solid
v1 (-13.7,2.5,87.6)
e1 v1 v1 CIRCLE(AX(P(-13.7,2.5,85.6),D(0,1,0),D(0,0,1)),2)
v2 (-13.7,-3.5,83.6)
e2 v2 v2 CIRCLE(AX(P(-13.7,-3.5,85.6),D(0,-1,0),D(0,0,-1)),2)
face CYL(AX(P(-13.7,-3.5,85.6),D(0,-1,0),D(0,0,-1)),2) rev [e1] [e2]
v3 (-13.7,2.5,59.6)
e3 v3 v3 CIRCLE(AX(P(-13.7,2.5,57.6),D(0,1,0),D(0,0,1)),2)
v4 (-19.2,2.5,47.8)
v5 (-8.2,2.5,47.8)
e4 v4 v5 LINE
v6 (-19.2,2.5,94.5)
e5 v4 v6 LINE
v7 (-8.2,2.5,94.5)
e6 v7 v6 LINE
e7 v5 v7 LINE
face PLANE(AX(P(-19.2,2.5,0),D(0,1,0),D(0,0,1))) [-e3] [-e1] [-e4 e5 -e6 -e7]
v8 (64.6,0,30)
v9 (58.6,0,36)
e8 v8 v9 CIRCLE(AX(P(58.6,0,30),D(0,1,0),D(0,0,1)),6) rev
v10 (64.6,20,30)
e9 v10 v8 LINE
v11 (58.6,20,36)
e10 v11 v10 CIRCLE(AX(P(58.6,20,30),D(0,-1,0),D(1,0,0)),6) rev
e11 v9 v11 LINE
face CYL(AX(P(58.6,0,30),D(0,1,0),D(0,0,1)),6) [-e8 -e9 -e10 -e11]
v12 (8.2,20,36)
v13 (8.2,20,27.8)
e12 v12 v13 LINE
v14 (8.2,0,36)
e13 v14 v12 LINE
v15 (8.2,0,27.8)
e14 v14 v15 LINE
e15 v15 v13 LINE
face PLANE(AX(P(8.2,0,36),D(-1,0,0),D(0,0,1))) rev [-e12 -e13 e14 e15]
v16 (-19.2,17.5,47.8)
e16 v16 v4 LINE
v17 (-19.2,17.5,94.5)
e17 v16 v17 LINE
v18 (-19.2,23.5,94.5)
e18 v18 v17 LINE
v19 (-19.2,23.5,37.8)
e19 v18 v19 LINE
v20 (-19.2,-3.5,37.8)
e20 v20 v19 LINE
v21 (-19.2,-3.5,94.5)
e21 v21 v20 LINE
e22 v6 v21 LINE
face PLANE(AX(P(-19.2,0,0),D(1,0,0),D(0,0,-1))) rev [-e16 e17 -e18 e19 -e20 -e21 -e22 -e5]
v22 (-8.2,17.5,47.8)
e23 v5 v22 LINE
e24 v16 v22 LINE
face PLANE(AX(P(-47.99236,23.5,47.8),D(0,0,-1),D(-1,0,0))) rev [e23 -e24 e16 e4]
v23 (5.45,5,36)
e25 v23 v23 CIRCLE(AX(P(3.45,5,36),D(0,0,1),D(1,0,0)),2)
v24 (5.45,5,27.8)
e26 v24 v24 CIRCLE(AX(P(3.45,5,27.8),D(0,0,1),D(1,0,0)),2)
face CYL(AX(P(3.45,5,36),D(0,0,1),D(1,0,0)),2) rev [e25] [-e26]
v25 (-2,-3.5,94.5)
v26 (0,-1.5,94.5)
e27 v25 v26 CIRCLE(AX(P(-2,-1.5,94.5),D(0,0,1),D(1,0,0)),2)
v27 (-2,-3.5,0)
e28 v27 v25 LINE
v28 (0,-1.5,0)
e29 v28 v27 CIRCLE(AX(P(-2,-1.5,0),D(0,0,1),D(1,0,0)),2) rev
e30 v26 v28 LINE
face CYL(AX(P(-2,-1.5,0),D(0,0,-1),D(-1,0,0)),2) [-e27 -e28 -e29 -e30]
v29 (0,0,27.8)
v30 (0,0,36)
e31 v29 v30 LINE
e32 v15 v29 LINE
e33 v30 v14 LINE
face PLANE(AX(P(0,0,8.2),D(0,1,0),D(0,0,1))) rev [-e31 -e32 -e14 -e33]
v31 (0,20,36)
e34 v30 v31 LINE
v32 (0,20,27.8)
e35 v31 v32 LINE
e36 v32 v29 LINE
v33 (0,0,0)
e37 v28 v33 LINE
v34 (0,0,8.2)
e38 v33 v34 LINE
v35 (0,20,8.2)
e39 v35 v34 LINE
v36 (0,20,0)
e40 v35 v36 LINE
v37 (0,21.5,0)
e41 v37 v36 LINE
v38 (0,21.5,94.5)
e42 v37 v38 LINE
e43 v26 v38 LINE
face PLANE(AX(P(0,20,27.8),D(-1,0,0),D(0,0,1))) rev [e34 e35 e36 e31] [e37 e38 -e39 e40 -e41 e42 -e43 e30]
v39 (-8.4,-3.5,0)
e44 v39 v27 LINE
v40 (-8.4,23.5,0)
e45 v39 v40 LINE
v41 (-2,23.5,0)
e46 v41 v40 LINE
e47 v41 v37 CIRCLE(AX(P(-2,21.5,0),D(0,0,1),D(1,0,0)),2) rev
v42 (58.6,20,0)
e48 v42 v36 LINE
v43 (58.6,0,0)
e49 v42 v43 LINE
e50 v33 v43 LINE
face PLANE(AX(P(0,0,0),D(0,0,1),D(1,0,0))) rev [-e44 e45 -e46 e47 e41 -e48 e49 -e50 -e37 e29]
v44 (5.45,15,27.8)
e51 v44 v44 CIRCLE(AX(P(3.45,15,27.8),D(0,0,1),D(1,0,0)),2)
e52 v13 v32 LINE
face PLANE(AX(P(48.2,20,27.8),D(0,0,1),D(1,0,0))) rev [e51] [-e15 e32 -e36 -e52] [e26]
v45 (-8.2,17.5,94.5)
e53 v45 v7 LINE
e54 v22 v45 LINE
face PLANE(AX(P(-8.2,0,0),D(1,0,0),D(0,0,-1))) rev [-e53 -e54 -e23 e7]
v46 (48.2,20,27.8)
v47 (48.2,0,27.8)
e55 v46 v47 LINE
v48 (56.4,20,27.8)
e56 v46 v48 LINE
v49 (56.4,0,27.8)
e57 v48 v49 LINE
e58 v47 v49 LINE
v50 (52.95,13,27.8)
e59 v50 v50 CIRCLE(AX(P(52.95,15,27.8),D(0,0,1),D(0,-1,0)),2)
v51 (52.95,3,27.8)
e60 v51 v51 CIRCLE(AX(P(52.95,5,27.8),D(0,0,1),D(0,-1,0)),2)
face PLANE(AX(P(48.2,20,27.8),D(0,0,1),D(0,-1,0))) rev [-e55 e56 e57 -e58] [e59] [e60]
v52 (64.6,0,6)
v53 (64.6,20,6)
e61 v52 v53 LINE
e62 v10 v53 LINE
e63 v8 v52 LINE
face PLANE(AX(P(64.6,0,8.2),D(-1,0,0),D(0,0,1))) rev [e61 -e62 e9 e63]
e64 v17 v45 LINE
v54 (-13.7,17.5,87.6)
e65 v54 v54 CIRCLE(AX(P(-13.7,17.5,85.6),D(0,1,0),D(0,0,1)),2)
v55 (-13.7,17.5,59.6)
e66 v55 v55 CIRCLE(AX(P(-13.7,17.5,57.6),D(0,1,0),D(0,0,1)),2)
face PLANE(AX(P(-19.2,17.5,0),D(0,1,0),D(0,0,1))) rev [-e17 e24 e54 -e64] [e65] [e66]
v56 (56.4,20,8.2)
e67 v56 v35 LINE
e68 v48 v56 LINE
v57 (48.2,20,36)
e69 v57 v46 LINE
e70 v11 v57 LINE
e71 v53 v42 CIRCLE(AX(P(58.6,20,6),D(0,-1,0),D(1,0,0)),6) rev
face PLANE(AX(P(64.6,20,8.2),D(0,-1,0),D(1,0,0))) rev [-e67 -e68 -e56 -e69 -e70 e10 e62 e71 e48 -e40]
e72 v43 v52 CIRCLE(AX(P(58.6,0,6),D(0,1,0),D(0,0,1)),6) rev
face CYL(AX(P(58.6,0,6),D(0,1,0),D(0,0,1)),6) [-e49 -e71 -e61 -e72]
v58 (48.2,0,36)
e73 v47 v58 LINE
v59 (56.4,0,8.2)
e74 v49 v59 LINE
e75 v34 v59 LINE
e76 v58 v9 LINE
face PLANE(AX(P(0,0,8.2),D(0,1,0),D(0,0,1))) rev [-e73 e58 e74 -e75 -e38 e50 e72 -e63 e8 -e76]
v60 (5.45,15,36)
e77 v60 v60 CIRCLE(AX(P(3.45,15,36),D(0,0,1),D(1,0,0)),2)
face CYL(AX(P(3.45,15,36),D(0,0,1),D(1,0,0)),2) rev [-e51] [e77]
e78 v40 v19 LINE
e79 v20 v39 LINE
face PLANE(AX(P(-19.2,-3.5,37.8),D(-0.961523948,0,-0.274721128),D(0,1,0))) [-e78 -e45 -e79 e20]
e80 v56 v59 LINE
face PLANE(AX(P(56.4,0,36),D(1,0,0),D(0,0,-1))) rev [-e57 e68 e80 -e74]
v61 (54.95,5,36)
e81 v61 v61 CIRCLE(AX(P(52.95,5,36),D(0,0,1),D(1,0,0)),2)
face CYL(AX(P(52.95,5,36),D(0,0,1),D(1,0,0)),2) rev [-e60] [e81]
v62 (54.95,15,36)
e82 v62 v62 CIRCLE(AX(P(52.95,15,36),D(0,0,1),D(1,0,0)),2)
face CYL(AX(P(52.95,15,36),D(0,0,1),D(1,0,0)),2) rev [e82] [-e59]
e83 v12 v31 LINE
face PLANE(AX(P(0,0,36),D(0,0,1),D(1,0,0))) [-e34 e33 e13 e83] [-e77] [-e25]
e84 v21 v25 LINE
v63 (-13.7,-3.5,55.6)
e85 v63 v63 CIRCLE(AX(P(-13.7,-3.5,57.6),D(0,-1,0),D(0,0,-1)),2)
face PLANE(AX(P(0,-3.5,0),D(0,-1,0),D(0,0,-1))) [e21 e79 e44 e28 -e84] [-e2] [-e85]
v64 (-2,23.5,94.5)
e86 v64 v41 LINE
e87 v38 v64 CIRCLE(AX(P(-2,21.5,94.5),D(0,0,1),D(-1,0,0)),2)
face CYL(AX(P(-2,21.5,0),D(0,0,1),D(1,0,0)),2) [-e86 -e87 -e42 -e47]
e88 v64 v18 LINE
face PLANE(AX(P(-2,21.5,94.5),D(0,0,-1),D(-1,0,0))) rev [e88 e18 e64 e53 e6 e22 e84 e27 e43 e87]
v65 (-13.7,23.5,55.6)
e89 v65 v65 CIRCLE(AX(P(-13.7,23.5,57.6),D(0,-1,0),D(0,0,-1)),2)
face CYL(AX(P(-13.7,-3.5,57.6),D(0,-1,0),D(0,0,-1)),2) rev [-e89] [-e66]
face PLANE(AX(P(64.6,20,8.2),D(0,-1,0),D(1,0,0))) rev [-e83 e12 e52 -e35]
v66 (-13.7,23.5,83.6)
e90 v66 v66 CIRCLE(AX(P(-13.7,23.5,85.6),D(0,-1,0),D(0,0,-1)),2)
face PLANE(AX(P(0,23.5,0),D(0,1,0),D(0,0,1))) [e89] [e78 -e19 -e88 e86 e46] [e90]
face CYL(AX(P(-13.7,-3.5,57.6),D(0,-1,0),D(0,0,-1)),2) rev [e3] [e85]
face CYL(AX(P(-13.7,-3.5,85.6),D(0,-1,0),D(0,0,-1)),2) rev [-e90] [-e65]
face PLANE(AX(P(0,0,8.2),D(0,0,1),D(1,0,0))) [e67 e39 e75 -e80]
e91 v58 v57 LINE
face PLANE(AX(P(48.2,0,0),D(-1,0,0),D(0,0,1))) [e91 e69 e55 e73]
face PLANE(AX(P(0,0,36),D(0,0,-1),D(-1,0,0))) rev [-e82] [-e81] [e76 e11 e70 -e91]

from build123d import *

# Parameters (mm, degrees)
SCHIZZO1_W                    = 64.6
SCHIZZO1_H                    = 20
ESTRUSIONE_ESTRUSIONE1_DEPTH  = 8.2
SCHIZZO2_W                    = 8.2
SCHIZZO2_H                    = 20
ESTRUSIONE_ESTRUSIONE2_DEPTH  = 27.8
SCHIZZO3_W                    = 8.2
SCHIZZO3_H                    = 20
ESTRUSIONE_ESTRUSIONE3_DEPTH  = 27.8
SCHIZZO4_W                    = 8.2
SCHIZZO4_H                    = 20
ESTRUSIONE_ESTRUSIONE4_DEPTH  = 8.2
SCHIZZO5_W                    = 36
SCHIZZO5_H                    = 20
ESTRUSIONE_ESTRUSIONE5_DEPTH  = 8.2
SCHIZZO6_W                    = 48.2
SCHIZZO6_H                    = 19.6
TAGLIO_ESTRUSIONE1_DEPTH      = 77.610443152
F_4_0_4_DIAMETER_HOLE2_D      = 4
F_4_0_4_DIAMETER_HOLE2_DEPTH  = 8.2
RACCORDO3_R                   = 6
SCHIZZO15_W                   = 8.2
SCHIZZO15_H                   = 36
ESTRUSIONE_ESTRUSIONE7_DEPTH  = 3.5
SCHIZZO16_W                   = 8.2
SCHIZZO16_H                   = 36
ESTRUSIONE_ESTRUSIONE8_DEPTH  = 3.5
SCHIZZO17_W                   = 36
SCHIZZO17_H                   = 6
ESTRUSIONE_ESTRUSIONE9_DEPTH  = 11
RACCORDO6_R                   = 2
ESTRUSIONE_ESTRUSIONE11_DEPTH = 58.5
F_4_0_4_DIAMETER_HOLE1_D      = 4
SKETCH1_W                     = 47.8
SKETCH1_H                     = 27
CUT_EXTRUDE1_DEPTH            = 11
SKETCH3_W                     = 10
SKETCH3_H                     = 27
BOSS_EXTRUDE1_DEPTH           = 11
CHAMFER1_SIZE                 = 11
CHAMFER1_SIZE_2               = 38.5


with BuildPart() as part:
    # Schizzo1 → Estrusione-Estrusione1 (new body)
    with BuildSketch(Plane.XY):
        with Locations((32.3, 10)):
            Rectangle(SCHIZZO1_W, SCHIZZO1_H)
    extrude(amount=ESTRUSIONE_ESTRUSIONE1_DEPTH)

    # Schizzo2 → Estrusione-Estrusione2 (add)
    with BuildSketch(Plane.XY.offset(8.2)):
        with Locations((4.1, 10)):
            Rectangle(SCHIZZO2_W, SCHIZZO2_H)
    extrude(amount=ESTRUSIONE_ESTRUSIONE2_DEPTH)

    # Schizzo3 → Estrusione-Estrusione3 (add)
    with BuildSketch(Plane.XY.offset(8.2)):
        with Locations((60.5, 10)):
            Rectangle(SCHIZZO3_W, SCHIZZO3_H)
    extrude(amount=ESTRUSIONE_ESTRUSIONE3_DEPTH)

    # Schizzo4 → Estrusione-Estrusione4 (add)
    with BuildSketch(Plane.ZY.offset(-56.4)):
        with Locations((31.9, 10)):
            Rectangle(SCHIZZO4_W, SCHIZZO4_H)
    extrude(amount=ESTRUSIONE_ESTRUSIONE4_DEPTH)

    # Schizzo5 → Estrusione-Estrusione5 (add)
    with BuildSketch(Plane.ZY):
        with Locations((18, 10)):
            Rectangle(SCHIZZO5_W, SCHIZZO5_H)
    extrude(amount=ESTRUSIONE_ESTRUSIONE5_DEPTH)

    # Schizzo6 → Taglio-Estrusione1 (cut, through all)
    with BuildSketch(Plane.XZ):
        with Locations((24.1, 18)):
            Rectangle(SCHIZZO6_W, SCHIZZO6_H)
    extrude(amount=-TAGLIO_ESTRUSIONE1_DEPTH, mode=Mode.SUBTRACT)

    # Ø4.0 (4) Diameter Hole2
    with Locations(Plane.XY.offset(36)):
        with Locations((52.95, 5), (3.45, 5), (3.45, 15), (52.95, 15)):
            Hole(F_4_0_4_DIAMETER_HOLE2_D / 2, depth=F_4_0_4_DIAMETER_HOLE2_DEPTH)

    # Raccordo3
    raccordo3_edges = [part.edges().sort_by_distance(p)[0] for p in [
        (64.6, 10, 36),
        (64.6, 10, 0),
    ]]
    fillet(raccordo3_edges, radius=RACCORDO3_R)

    # Schizzo15 → Estrusione-Estrusione7 (add)
    with BuildSketch(Plane.XZ):
        with Locations((-4.1, 18)):
            Rectangle(SCHIZZO15_W, SCHIZZO15_H)
    extrude(amount=ESTRUSIONE_ESTRUSIONE7_DEPTH)

    # Schizzo16 → Estrusione-Estrusione8 (add)
    with BuildSketch(Plane(origin=(0, 20, 0), x_dir=(1, 0, 0), z_dir=(0, 1, 0))):
        with Locations((-4.1, -18)):
            Rectangle(SCHIZZO16_W, SCHIZZO16_H)
    extrude(amount=ESTRUSIONE_ESTRUSIONE8_DEPTH)

    # Schizzo17 → Estrusione-Estrusione9 (add)
    with BuildSketch(Plane.ZY.offset(8.2)):
        with Locations((18, 20.5)):
            Rectangle(SCHIZZO17_W, SCHIZZO17_H)
        with Locations((18, -0.5)):
            Rectangle(SCHIZZO17_W, SCHIZZO17_H)
    extrude(amount=ESTRUSIONE_ESTRUSIONE9_DEPTH)

    # Raccordo6
    raccordo6_edges = [part.edges().sort_by_distance(p)[0] for p in [
        (0, -3.5, 18),
        (0, 23.5, 18),
    ]]
    fillet(raccordo6_edges, radius=RACCORDO6_R)

    # Schizzo24 → Estrusione-Estrusione11 (add)
    with BuildSketch(Plane.XY.offset(36)):
        with BuildLine():
            Line((-2, 23.5), (-19.2, 23.5))
            Line((-19.2, 23.5), (-19.2, 17.5))
            Line((-19.2, 17.5), (-8.2, 17.5))
            Line((-8.2, 17.5), (-8.2, 2.5))
            Line((-8.2, 2.5), (-19.2, 2.5))
            Line((-19.2, 2.5), (-19.2, -3.5))
            Line((-19.2, -3.5), (-2, -3.5))
            ThreePointArc((-2, -3.5), (-0.585786438, -2.914213562), (0, -1.5))
            Line((0, -1.5), (0, 21.5))
            ThreePointArc((0, 21.5), (-0.585786438, 22.914213562), (-2, 23.5))
        make_face()
    extrude(amount=ESTRUSIONE_ESTRUSIONE11_DEPTH)

    # Ø4.0 (4) Diameter Hole1 (through all)
    with Locations(Plane(origin=(0, -3.5, 0), x_dir=(-1, 0, 0), z_dir=(0, -1, 0))):
        with Locations((13.7, -85.6), (13.7, -57.6)):
            Hole(F_4_0_4_DIAMETER_HOLE1_D / 2)

    # Sketch1 → Cut-Extrude1 (cut)
    with BuildSketch(Plane.ZY.offset(19.2)):
        with Locations((23.9, 10)):
            Rectangle(SKETCH1_W, SKETCH1_H)
    extrude(amount=-CUT_EXTRUDE1_DEPTH, mode=Mode.SUBTRACT)

    # Sketch3 → Boss-Extrude1 (add)
    with BuildSketch(Plane.ZY.offset(8.2)):
        with Locations((42.8, 10)):
            Rectangle(SKETCH3_W, SKETCH3_H)
    extrude(amount=BOSS_EXTRUDE1_DEPTH)

    # Chamfer1
    # the kernel refuses this chamfer: 38.5, 11 mm, written as the material it adds along each edge
    with BuildSketch(Plane(origin=(-8.2, -3.5, 37.8), x_dir=(-0.9917027448815273, 0, 0.1285521909359956), z_dir=(0, 1, 0))) as chamfer1_piece_1_section:
        Polygon((CHAMFER1_SIZE * 0.991702744882, -CHAMFER1_SIZE * 0.128552190936), (-CHAMFER1_SIZE_2 * 0.128552190936, -CHAMFER1_SIZE_2 * 0.991702744882), (0, 0), align=None)
    chamfer1_piece_1 = extrude(amount=27, mode=Mode.PRIVATE)
    chamfer1_piece_1 = split(chamfer1_piece_1, bisect_by=Plane(origin=(-11.867857143, 10, 0), z_dir=(0, 0, 1)), keep=Keep.TOP, mode=Mode.PRIVATE)
    add(chamfer1_piece_1)


solid = part.part
